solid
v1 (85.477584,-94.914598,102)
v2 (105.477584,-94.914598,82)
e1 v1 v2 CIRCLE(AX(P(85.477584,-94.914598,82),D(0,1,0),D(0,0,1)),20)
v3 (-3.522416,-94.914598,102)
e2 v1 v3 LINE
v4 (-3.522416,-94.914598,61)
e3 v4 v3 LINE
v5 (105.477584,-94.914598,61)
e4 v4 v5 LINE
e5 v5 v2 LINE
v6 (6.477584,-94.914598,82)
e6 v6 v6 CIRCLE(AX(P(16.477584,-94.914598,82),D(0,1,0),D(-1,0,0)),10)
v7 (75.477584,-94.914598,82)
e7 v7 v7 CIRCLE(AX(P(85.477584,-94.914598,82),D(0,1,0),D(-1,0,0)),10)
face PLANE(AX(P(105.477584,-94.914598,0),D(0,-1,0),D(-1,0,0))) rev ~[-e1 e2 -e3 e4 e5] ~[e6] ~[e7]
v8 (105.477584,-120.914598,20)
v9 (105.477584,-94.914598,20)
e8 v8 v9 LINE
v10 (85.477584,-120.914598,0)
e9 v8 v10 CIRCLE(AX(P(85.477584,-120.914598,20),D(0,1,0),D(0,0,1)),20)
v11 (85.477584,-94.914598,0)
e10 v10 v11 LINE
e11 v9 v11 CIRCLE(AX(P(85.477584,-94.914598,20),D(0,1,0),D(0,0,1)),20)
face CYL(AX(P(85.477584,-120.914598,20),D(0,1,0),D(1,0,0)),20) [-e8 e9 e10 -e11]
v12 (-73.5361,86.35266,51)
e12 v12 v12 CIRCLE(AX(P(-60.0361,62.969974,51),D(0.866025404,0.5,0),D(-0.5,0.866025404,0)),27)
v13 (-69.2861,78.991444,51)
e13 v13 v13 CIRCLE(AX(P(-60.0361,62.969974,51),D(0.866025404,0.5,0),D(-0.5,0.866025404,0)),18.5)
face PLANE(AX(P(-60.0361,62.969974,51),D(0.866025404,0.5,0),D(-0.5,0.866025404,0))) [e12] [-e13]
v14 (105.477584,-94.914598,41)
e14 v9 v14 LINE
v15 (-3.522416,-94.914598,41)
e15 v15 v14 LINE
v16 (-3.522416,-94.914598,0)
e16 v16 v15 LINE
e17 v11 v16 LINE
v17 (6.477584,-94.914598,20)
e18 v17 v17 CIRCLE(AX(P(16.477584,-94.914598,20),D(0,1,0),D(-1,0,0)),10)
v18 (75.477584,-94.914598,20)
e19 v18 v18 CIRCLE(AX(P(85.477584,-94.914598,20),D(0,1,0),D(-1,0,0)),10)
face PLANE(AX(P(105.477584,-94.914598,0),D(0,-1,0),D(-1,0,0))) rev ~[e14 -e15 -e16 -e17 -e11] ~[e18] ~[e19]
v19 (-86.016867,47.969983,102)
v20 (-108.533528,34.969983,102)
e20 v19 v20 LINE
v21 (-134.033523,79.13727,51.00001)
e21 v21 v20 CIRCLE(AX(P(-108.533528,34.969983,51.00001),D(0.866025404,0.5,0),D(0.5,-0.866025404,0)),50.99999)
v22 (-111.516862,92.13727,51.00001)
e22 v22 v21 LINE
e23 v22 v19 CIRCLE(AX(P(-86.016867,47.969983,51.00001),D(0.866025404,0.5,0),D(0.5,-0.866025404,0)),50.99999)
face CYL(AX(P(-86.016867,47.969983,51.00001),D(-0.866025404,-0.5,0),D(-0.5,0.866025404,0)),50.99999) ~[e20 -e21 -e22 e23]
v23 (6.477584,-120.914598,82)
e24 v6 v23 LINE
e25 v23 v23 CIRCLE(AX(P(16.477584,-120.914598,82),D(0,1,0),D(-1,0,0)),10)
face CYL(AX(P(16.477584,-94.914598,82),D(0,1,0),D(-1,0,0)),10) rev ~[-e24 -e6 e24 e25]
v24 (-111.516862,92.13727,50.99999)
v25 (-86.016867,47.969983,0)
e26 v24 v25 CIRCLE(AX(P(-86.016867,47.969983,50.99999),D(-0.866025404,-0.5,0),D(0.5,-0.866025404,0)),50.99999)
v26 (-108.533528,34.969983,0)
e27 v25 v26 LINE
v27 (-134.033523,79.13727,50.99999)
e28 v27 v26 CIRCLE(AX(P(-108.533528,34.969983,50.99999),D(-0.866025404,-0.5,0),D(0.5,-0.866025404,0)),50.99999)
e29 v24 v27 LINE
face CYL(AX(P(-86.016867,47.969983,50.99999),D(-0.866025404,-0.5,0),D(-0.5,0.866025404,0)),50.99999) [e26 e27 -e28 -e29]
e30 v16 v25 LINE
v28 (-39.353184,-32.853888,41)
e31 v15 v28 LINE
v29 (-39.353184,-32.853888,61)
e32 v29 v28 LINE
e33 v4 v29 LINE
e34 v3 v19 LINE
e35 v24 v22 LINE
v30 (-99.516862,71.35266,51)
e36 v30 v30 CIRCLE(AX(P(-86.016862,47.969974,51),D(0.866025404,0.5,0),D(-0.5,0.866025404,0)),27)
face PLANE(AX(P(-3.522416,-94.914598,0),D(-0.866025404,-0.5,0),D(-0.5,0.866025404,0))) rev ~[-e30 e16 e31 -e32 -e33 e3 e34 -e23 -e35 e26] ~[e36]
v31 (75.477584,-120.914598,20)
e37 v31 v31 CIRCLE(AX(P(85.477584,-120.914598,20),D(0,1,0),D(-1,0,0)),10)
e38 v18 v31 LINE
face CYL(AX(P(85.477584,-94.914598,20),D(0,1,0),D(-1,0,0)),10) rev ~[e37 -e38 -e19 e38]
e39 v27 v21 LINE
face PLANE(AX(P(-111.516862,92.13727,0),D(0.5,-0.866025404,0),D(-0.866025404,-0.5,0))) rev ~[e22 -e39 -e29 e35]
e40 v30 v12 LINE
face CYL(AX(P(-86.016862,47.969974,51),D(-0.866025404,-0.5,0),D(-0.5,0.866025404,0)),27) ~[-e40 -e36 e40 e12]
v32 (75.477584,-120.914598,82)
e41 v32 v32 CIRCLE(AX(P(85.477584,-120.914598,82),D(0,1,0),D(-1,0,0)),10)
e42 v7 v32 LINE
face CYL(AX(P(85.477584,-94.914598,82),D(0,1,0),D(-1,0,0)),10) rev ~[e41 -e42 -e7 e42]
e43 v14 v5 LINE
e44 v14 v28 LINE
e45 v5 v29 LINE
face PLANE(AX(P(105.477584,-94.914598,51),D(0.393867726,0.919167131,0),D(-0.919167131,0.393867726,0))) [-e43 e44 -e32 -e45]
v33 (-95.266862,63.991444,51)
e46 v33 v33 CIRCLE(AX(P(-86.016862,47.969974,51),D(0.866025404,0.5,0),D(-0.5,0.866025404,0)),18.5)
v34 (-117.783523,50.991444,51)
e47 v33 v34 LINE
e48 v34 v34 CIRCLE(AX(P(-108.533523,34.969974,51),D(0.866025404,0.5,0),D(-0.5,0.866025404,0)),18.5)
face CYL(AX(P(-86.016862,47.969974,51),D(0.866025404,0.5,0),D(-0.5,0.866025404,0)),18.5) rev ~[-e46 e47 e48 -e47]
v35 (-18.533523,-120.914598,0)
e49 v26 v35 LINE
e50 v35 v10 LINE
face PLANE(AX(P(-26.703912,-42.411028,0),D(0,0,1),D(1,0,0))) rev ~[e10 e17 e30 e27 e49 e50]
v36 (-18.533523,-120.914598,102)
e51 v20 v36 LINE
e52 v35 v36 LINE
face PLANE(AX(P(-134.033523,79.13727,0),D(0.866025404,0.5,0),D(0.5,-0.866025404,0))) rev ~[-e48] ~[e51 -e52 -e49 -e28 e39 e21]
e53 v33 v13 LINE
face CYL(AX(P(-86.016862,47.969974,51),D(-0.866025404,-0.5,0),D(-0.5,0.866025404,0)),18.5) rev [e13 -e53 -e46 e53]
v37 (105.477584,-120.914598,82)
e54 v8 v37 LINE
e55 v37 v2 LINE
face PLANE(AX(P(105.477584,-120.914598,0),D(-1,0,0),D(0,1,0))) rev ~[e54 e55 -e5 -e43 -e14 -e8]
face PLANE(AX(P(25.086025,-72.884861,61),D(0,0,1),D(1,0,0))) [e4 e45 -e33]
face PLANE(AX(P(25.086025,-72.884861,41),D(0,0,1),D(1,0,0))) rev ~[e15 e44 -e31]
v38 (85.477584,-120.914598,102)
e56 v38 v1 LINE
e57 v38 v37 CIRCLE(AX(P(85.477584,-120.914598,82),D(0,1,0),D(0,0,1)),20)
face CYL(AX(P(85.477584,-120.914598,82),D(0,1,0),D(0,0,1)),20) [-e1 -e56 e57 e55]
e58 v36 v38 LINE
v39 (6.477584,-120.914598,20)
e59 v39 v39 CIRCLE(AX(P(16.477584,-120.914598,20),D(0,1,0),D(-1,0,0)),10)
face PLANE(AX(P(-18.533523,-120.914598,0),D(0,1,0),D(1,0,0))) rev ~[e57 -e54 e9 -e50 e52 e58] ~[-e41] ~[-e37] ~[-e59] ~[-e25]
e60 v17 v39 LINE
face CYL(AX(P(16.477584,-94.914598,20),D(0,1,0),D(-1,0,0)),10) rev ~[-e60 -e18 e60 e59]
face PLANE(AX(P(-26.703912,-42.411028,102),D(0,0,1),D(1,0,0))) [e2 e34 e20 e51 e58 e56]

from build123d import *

# Parameters (mm, degrees)
F1_DEPTH  = 102
F2_R      = 50.99999
F3_R      = 27
F3_R_2    = 18.5
F4_DEPTH  = 30
F8_DEPTH  = 10
F5_R      = 10
F9_DEPTH  = 30
F10_R     = 18.5
F11_DEPTH = 30
F12_R     = 20
F13_R     = 20


# Not quite as in the source:
# - a fillet or chamfer is up to 0.001 mm smaller than in the source, because OpenCascade refuses the exact size


with BuildPart() as f1:
    # F0 (on Top) → F1 (new body)
    with BuildSketch(Plane.XY):
        Polygon((-3.5224159509, -94.9145984159), (-111.5168624514, 92.1372698583), (-134.0335229498, 79.1372698583), (-18.5335229498, -120.9145984159), (105.4775840491, -120.9145984159), (105.4775840491, -94.9145984159), align=None)
    extrude(amount=F1_DEPTH)

    # F2 (radius 51 in the source; OpenCascade refuses exactly that, so slightly less here)
    f2_edges = [f1.edges().sort_by_distance(p)[0] for p in [
        (-122.775193, 85.63727, 102),
        (-122.775193, 85.63727, 0),
    ]]
    fillet(f2_edges, radius=F2_R)

    # F3 (on face) → F4 (join)
    with BuildSketch(Plane(origin=(-43.7410386722, -25.253900452, 0), x_dir=(-0.5, 0.8660254038, 0), z_dir=(0.8660254038, 0.5, 0))):
        with Locations((84.5516475584, 51)):
            Circle(F3_R)
        with Locations((84.5516475584, 51)):
            Circle(F3_R_2, mode=Mode.SUBTRACT)
    extrude(amount=F4_DEPTH)

    # F7 (on offset) → F8 (join, symmetric)
    with BuildSketch(Plane.XY.offset(51)):
        Polygon((-3.5224159509, -94.9145984159), (105.4775840491, -94.9145984159), (-44.2564783831, -30.7528017003), align=None)
    extrude(amount=F8_DEPTH, both=True)

    # F5 (on face) → F9 (cut)
    with BuildSketch(Plane(origin=(0, -94.9145984159, 0), x_dir=(-1, 0, 0), z_dir=(0, 1, 0))):
        with Locations((-85.4775840491, 82)):
            Circle(F5_R)
        with Locations((-85.4775840491, 20)):
            Circle(F5_R)
        with Locations((-16.4775840491, 82)):
            Circle(F5_R)
        with Locations((-16.4775840491, 20)):
            Circle(F5_R)
    extrude(amount=-F9_DEPTH, mode=Mode.SUBTRACT)

    # F10 (on face) → F11 (cut)
    with BuildSketch(Plane(origin=(-43.7410386722, -25.253900452, 0), x_dir=(-0.5, 0.8660254038, 0), z_dir=(0.8660254038, 0.5, 0))):
        with Locations((84.5516475584, 51)):
            Circle(F10_R)
    extrude(amount=-F11_DEPTH, mode=Mode.SUBTRACT)

    # F12
    f12_edges = [f1.edges().sort_by_distance(p)[0] for p in [
        (105.477584, -107.914598, 102),
    ]]
    fillet(f12_edges, radius=F12_R)

    # F13
    f13_edges = [f1.edges().sort_by_distance(p)[0] for p in [
        (105.477584, -107.914598, 0),
    ]]
    fillet(f13_edges, radius=F13_R)


solid = f1.part
